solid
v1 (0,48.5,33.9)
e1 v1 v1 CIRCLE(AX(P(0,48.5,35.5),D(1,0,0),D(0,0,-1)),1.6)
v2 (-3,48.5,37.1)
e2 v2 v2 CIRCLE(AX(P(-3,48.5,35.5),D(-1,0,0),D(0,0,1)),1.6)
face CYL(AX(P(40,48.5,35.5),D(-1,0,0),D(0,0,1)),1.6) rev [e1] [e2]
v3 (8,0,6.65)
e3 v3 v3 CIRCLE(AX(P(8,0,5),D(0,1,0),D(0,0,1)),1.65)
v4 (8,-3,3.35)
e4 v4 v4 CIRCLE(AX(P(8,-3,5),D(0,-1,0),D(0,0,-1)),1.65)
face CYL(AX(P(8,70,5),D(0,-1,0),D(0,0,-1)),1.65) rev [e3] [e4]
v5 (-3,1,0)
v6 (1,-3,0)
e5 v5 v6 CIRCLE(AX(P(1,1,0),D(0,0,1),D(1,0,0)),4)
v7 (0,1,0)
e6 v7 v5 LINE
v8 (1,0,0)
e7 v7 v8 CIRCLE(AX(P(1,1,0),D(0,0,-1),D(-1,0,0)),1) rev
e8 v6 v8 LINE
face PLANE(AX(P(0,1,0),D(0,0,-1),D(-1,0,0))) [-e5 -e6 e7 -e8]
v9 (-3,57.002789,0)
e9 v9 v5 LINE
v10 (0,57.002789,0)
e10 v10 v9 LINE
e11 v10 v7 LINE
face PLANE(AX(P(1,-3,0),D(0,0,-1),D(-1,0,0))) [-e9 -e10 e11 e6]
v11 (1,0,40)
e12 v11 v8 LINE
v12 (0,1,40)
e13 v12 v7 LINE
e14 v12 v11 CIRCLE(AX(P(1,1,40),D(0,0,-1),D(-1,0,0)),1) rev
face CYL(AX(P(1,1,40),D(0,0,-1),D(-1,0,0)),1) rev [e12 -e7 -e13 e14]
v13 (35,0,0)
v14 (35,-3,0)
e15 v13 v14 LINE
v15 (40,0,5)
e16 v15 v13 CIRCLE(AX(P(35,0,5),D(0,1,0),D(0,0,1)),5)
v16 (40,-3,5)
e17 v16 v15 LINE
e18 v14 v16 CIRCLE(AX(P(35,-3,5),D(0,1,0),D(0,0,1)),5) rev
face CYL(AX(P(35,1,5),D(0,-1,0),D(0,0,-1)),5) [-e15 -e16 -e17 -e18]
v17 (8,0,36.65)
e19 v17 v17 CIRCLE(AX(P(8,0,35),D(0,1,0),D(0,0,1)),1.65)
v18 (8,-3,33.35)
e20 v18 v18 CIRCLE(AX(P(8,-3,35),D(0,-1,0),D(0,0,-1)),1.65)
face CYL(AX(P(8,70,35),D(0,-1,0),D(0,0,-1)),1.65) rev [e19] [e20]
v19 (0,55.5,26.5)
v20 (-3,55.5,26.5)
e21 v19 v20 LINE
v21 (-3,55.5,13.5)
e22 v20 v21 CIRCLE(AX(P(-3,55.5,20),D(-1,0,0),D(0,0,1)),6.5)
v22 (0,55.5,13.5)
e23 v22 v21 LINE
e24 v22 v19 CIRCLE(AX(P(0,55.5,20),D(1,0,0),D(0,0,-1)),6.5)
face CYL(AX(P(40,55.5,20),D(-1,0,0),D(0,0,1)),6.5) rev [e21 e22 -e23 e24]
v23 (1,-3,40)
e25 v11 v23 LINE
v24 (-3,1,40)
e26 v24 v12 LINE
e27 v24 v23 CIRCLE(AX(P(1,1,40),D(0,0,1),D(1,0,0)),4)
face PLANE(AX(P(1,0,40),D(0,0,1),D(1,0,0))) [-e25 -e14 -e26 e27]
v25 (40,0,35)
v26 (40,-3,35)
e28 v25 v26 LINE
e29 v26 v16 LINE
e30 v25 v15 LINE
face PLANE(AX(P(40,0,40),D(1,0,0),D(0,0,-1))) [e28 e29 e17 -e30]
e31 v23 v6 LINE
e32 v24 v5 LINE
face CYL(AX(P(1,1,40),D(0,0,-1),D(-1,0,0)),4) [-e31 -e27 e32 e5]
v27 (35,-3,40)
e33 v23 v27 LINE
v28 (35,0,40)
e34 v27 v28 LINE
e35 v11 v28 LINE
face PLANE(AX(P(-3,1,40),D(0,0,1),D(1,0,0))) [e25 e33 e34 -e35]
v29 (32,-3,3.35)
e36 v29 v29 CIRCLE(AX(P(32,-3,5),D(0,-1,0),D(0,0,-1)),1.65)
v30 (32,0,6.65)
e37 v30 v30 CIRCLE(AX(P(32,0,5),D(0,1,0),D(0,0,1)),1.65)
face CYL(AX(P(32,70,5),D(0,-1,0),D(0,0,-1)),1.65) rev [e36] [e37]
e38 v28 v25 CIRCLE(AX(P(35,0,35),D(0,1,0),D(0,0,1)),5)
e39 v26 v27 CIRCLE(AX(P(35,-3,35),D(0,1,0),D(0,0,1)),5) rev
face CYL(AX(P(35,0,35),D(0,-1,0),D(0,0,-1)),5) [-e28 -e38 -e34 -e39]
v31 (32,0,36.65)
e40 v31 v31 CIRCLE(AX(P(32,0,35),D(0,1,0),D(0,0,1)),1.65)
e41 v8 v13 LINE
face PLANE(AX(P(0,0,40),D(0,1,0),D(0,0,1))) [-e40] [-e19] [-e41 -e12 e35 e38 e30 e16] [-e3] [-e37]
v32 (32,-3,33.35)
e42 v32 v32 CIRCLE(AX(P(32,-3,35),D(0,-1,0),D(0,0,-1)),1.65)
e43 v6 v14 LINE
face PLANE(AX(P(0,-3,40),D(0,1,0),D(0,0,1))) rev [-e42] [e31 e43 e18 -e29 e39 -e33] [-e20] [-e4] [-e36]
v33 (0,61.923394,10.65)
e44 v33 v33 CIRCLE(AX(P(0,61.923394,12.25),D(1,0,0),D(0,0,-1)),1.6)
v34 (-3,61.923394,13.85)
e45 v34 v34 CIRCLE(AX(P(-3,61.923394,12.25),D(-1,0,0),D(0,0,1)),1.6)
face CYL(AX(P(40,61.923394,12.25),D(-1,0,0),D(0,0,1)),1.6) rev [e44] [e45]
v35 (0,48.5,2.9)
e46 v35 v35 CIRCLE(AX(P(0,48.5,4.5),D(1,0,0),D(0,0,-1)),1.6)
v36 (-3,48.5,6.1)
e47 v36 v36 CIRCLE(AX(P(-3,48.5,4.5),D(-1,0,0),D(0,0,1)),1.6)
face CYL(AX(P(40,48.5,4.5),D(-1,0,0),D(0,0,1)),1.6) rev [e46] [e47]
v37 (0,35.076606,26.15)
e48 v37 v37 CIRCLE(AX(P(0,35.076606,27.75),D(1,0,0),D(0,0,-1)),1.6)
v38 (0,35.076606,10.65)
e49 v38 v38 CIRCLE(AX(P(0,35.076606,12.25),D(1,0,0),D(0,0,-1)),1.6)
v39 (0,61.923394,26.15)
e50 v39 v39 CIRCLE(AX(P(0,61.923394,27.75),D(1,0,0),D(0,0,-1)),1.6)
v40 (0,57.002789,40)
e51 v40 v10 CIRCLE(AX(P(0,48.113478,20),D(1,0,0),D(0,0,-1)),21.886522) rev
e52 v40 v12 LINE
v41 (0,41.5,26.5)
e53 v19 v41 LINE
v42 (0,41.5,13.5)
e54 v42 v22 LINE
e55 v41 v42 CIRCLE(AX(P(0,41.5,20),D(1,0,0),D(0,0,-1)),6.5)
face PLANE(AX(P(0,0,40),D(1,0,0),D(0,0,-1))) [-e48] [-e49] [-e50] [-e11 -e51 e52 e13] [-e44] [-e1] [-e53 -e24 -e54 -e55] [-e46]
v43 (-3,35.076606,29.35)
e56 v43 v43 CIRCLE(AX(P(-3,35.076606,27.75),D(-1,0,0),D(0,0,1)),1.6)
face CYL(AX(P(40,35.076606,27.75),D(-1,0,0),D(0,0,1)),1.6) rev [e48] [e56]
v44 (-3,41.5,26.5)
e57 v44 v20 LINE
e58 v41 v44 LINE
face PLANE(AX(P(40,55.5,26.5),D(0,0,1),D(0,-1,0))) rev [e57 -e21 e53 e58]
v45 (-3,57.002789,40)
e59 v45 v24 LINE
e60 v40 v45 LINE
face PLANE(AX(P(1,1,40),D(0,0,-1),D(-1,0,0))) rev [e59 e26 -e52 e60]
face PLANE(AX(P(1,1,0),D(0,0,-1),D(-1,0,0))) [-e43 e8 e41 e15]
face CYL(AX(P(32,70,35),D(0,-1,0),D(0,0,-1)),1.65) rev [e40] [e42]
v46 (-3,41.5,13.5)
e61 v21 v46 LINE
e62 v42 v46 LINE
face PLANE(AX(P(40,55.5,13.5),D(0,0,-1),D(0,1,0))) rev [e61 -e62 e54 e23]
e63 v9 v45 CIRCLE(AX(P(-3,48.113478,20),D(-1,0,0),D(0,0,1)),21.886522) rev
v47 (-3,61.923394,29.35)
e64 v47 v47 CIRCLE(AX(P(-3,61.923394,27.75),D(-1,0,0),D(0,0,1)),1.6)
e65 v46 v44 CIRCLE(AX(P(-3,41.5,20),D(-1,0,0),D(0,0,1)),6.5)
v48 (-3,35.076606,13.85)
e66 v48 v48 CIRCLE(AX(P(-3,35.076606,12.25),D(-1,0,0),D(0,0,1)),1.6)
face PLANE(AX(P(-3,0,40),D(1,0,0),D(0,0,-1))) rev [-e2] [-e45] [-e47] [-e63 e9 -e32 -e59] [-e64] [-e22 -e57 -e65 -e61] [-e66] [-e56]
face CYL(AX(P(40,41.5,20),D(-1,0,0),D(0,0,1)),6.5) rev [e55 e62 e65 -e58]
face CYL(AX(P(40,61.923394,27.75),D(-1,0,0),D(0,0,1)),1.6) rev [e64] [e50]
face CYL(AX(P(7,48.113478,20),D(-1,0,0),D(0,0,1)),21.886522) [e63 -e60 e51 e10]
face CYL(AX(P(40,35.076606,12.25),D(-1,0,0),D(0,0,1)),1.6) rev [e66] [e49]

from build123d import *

# Parameters (mm, degrees)
SM_BASE_FLANGE_1_DEPTH      = 40
CUT_EXTRUDE_3_DEPTH         = 10
CUT_EXTRUDE_1_DEPTH         = 92.372862492
SKETCH_7_R                  = 1.6
CUT_EXTRUDE_2_DEPTH         = 92.372862492
SKETCH_9_R                  = 1.65
CUT_EXTRUDE_4_DEPTH         = 93.352585237
PATTERN_LINEAR_1_COUNT      = 2
PATTERN_LINEAR_1_PITCH      = 30
PATTERN_LINEAR_1_COUNT_DIR2 = 2
PATTERN_LINEAR_1_PITCH_DIR2 = 24
FILLET_1_R                  = 5


# Sheet-metal steps are written as plain solids
with BuildPart() as part:
    # Sketch 1 → 基材-凸緣1 (new body)
    with BuildSketch(Plane.XY):
        with BuildLine():
            Line((40, 0), (1, 0))
            ThreePointArc((1, 0), (0.292893219, 0.292893219), (0, 1))
            Line((0, 1), (0, 70))
            Line((0, 70), (-3, 70))
            Line((-3, 70), (-3, 1))
            ThreePointArc((-3, 1), (-1.828427125, -1.828427125), (1, -3))
            Line((1, -3), (40, -3))
            Line((40, -3), (40, 0))
        make_face()
    extrude(amount=SM_BASE_FLANGE_1_DEPTH)

    # 草圖8 → 除料-伸長3 (cut)
    with BuildSketch(Plane.ZY.offset(3)):
        with BuildLine():
            Line((0, 70), (0, 57.002788981))
            ThreePointArc((0, 57.002788981), (8.073899482, 66.465261916), (20, 70))
            Line((20, 70), (0, 70))
        make_face()
        with BuildLine():
            ThreePointArc((20, 70), (31.926100518, 66.465261916), (40, 57.002788981))
            Line((40, 57.002788981), (40, 70))
            Line((40, 70), (20, 70))
        make_face()
    extrude(amount=-CUT_EXTRUDE_3_DEPTH, mode=Mode.SUBTRACT)

    # 草圖6 → 除料-伸長1 (cut, through all)
    with BuildSketch(Plane.ZY.offset(3)):
        with BuildLine():
            Line((26.5, 55.5), (26.5, 41.5))
            ThreePointArc((26.5, 41.5), (20, 35), (13.5, 41.5))
            Line((13.5, 41.5), (13.5, 55.5))
            ThreePointArc((13.5, 55.5), (20, 62), (26.5, 55.5))
        make_face()
    extrude(amount=-CUT_EXTRUDE_1_DEPTH, mode=Mode.SUBTRACT)

    # 草圖7 → 除料-伸長2 (cut, through all)
    with BuildSketch(Plane.ZY.offset(3)):
        with Locations((4.5, 48.5)):
            Circle(SKETCH_7_R)
        with Locations((12.25, 35.076606241)):
            Circle(SKETCH_7_R)
        with Locations((27.75, 35.076606241)):
            Circle(SKETCH_7_R)
        with Locations((35.5, 48.5)):
            Circle(SKETCH_7_R)
        with Locations((27.75, 61.923393759)):
            Circle(SKETCH_7_R)
        with Locations((12.25, 61.923393759)):
            Circle(SKETCH_7_R)
    extrude(amount=-CUT_EXTRUDE_2_DEPTH, mode=Mode.SUBTRACT)

    # 草圖9 → 除料-伸長4 (cut, through all)
    with BuildSketch(Plane.XZ.offset(3)):
        with Locations(Location((32, 35, 0), (0, 0, 270))):
            Circle(SKETCH_9_R)
    cut_extrude_4 = extrude(amount=-CUT_EXTRUDE_4_DEPTH, mode=Mode.SUBTRACT)

    # 直線複製排列1: Cut-Extrude 4 2 × 2
    with Locations(*[(-j * PATTERN_LINEAR_1_PITCH_DIR2, 0, -i * PATTERN_LINEAR_1_PITCH) for i in range(PATTERN_LINEAR_1_COUNT) for j in range(PATTERN_LINEAR_1_COUNT_DIR2) if (i, j) != (0, 0)]):
        add(cut_extrude_4, mode=Mode.SUBTRACT)

    # 圓角1
    fillet_1_edges = [part.edges().sort_by_distance(p)[0] for p in [
        (40, -1.5, 40),
        (40, -1.5, 0),
    ]]
    fillet(fillet_1_edges, radius=FILLET_1_R)


solid = part.part
